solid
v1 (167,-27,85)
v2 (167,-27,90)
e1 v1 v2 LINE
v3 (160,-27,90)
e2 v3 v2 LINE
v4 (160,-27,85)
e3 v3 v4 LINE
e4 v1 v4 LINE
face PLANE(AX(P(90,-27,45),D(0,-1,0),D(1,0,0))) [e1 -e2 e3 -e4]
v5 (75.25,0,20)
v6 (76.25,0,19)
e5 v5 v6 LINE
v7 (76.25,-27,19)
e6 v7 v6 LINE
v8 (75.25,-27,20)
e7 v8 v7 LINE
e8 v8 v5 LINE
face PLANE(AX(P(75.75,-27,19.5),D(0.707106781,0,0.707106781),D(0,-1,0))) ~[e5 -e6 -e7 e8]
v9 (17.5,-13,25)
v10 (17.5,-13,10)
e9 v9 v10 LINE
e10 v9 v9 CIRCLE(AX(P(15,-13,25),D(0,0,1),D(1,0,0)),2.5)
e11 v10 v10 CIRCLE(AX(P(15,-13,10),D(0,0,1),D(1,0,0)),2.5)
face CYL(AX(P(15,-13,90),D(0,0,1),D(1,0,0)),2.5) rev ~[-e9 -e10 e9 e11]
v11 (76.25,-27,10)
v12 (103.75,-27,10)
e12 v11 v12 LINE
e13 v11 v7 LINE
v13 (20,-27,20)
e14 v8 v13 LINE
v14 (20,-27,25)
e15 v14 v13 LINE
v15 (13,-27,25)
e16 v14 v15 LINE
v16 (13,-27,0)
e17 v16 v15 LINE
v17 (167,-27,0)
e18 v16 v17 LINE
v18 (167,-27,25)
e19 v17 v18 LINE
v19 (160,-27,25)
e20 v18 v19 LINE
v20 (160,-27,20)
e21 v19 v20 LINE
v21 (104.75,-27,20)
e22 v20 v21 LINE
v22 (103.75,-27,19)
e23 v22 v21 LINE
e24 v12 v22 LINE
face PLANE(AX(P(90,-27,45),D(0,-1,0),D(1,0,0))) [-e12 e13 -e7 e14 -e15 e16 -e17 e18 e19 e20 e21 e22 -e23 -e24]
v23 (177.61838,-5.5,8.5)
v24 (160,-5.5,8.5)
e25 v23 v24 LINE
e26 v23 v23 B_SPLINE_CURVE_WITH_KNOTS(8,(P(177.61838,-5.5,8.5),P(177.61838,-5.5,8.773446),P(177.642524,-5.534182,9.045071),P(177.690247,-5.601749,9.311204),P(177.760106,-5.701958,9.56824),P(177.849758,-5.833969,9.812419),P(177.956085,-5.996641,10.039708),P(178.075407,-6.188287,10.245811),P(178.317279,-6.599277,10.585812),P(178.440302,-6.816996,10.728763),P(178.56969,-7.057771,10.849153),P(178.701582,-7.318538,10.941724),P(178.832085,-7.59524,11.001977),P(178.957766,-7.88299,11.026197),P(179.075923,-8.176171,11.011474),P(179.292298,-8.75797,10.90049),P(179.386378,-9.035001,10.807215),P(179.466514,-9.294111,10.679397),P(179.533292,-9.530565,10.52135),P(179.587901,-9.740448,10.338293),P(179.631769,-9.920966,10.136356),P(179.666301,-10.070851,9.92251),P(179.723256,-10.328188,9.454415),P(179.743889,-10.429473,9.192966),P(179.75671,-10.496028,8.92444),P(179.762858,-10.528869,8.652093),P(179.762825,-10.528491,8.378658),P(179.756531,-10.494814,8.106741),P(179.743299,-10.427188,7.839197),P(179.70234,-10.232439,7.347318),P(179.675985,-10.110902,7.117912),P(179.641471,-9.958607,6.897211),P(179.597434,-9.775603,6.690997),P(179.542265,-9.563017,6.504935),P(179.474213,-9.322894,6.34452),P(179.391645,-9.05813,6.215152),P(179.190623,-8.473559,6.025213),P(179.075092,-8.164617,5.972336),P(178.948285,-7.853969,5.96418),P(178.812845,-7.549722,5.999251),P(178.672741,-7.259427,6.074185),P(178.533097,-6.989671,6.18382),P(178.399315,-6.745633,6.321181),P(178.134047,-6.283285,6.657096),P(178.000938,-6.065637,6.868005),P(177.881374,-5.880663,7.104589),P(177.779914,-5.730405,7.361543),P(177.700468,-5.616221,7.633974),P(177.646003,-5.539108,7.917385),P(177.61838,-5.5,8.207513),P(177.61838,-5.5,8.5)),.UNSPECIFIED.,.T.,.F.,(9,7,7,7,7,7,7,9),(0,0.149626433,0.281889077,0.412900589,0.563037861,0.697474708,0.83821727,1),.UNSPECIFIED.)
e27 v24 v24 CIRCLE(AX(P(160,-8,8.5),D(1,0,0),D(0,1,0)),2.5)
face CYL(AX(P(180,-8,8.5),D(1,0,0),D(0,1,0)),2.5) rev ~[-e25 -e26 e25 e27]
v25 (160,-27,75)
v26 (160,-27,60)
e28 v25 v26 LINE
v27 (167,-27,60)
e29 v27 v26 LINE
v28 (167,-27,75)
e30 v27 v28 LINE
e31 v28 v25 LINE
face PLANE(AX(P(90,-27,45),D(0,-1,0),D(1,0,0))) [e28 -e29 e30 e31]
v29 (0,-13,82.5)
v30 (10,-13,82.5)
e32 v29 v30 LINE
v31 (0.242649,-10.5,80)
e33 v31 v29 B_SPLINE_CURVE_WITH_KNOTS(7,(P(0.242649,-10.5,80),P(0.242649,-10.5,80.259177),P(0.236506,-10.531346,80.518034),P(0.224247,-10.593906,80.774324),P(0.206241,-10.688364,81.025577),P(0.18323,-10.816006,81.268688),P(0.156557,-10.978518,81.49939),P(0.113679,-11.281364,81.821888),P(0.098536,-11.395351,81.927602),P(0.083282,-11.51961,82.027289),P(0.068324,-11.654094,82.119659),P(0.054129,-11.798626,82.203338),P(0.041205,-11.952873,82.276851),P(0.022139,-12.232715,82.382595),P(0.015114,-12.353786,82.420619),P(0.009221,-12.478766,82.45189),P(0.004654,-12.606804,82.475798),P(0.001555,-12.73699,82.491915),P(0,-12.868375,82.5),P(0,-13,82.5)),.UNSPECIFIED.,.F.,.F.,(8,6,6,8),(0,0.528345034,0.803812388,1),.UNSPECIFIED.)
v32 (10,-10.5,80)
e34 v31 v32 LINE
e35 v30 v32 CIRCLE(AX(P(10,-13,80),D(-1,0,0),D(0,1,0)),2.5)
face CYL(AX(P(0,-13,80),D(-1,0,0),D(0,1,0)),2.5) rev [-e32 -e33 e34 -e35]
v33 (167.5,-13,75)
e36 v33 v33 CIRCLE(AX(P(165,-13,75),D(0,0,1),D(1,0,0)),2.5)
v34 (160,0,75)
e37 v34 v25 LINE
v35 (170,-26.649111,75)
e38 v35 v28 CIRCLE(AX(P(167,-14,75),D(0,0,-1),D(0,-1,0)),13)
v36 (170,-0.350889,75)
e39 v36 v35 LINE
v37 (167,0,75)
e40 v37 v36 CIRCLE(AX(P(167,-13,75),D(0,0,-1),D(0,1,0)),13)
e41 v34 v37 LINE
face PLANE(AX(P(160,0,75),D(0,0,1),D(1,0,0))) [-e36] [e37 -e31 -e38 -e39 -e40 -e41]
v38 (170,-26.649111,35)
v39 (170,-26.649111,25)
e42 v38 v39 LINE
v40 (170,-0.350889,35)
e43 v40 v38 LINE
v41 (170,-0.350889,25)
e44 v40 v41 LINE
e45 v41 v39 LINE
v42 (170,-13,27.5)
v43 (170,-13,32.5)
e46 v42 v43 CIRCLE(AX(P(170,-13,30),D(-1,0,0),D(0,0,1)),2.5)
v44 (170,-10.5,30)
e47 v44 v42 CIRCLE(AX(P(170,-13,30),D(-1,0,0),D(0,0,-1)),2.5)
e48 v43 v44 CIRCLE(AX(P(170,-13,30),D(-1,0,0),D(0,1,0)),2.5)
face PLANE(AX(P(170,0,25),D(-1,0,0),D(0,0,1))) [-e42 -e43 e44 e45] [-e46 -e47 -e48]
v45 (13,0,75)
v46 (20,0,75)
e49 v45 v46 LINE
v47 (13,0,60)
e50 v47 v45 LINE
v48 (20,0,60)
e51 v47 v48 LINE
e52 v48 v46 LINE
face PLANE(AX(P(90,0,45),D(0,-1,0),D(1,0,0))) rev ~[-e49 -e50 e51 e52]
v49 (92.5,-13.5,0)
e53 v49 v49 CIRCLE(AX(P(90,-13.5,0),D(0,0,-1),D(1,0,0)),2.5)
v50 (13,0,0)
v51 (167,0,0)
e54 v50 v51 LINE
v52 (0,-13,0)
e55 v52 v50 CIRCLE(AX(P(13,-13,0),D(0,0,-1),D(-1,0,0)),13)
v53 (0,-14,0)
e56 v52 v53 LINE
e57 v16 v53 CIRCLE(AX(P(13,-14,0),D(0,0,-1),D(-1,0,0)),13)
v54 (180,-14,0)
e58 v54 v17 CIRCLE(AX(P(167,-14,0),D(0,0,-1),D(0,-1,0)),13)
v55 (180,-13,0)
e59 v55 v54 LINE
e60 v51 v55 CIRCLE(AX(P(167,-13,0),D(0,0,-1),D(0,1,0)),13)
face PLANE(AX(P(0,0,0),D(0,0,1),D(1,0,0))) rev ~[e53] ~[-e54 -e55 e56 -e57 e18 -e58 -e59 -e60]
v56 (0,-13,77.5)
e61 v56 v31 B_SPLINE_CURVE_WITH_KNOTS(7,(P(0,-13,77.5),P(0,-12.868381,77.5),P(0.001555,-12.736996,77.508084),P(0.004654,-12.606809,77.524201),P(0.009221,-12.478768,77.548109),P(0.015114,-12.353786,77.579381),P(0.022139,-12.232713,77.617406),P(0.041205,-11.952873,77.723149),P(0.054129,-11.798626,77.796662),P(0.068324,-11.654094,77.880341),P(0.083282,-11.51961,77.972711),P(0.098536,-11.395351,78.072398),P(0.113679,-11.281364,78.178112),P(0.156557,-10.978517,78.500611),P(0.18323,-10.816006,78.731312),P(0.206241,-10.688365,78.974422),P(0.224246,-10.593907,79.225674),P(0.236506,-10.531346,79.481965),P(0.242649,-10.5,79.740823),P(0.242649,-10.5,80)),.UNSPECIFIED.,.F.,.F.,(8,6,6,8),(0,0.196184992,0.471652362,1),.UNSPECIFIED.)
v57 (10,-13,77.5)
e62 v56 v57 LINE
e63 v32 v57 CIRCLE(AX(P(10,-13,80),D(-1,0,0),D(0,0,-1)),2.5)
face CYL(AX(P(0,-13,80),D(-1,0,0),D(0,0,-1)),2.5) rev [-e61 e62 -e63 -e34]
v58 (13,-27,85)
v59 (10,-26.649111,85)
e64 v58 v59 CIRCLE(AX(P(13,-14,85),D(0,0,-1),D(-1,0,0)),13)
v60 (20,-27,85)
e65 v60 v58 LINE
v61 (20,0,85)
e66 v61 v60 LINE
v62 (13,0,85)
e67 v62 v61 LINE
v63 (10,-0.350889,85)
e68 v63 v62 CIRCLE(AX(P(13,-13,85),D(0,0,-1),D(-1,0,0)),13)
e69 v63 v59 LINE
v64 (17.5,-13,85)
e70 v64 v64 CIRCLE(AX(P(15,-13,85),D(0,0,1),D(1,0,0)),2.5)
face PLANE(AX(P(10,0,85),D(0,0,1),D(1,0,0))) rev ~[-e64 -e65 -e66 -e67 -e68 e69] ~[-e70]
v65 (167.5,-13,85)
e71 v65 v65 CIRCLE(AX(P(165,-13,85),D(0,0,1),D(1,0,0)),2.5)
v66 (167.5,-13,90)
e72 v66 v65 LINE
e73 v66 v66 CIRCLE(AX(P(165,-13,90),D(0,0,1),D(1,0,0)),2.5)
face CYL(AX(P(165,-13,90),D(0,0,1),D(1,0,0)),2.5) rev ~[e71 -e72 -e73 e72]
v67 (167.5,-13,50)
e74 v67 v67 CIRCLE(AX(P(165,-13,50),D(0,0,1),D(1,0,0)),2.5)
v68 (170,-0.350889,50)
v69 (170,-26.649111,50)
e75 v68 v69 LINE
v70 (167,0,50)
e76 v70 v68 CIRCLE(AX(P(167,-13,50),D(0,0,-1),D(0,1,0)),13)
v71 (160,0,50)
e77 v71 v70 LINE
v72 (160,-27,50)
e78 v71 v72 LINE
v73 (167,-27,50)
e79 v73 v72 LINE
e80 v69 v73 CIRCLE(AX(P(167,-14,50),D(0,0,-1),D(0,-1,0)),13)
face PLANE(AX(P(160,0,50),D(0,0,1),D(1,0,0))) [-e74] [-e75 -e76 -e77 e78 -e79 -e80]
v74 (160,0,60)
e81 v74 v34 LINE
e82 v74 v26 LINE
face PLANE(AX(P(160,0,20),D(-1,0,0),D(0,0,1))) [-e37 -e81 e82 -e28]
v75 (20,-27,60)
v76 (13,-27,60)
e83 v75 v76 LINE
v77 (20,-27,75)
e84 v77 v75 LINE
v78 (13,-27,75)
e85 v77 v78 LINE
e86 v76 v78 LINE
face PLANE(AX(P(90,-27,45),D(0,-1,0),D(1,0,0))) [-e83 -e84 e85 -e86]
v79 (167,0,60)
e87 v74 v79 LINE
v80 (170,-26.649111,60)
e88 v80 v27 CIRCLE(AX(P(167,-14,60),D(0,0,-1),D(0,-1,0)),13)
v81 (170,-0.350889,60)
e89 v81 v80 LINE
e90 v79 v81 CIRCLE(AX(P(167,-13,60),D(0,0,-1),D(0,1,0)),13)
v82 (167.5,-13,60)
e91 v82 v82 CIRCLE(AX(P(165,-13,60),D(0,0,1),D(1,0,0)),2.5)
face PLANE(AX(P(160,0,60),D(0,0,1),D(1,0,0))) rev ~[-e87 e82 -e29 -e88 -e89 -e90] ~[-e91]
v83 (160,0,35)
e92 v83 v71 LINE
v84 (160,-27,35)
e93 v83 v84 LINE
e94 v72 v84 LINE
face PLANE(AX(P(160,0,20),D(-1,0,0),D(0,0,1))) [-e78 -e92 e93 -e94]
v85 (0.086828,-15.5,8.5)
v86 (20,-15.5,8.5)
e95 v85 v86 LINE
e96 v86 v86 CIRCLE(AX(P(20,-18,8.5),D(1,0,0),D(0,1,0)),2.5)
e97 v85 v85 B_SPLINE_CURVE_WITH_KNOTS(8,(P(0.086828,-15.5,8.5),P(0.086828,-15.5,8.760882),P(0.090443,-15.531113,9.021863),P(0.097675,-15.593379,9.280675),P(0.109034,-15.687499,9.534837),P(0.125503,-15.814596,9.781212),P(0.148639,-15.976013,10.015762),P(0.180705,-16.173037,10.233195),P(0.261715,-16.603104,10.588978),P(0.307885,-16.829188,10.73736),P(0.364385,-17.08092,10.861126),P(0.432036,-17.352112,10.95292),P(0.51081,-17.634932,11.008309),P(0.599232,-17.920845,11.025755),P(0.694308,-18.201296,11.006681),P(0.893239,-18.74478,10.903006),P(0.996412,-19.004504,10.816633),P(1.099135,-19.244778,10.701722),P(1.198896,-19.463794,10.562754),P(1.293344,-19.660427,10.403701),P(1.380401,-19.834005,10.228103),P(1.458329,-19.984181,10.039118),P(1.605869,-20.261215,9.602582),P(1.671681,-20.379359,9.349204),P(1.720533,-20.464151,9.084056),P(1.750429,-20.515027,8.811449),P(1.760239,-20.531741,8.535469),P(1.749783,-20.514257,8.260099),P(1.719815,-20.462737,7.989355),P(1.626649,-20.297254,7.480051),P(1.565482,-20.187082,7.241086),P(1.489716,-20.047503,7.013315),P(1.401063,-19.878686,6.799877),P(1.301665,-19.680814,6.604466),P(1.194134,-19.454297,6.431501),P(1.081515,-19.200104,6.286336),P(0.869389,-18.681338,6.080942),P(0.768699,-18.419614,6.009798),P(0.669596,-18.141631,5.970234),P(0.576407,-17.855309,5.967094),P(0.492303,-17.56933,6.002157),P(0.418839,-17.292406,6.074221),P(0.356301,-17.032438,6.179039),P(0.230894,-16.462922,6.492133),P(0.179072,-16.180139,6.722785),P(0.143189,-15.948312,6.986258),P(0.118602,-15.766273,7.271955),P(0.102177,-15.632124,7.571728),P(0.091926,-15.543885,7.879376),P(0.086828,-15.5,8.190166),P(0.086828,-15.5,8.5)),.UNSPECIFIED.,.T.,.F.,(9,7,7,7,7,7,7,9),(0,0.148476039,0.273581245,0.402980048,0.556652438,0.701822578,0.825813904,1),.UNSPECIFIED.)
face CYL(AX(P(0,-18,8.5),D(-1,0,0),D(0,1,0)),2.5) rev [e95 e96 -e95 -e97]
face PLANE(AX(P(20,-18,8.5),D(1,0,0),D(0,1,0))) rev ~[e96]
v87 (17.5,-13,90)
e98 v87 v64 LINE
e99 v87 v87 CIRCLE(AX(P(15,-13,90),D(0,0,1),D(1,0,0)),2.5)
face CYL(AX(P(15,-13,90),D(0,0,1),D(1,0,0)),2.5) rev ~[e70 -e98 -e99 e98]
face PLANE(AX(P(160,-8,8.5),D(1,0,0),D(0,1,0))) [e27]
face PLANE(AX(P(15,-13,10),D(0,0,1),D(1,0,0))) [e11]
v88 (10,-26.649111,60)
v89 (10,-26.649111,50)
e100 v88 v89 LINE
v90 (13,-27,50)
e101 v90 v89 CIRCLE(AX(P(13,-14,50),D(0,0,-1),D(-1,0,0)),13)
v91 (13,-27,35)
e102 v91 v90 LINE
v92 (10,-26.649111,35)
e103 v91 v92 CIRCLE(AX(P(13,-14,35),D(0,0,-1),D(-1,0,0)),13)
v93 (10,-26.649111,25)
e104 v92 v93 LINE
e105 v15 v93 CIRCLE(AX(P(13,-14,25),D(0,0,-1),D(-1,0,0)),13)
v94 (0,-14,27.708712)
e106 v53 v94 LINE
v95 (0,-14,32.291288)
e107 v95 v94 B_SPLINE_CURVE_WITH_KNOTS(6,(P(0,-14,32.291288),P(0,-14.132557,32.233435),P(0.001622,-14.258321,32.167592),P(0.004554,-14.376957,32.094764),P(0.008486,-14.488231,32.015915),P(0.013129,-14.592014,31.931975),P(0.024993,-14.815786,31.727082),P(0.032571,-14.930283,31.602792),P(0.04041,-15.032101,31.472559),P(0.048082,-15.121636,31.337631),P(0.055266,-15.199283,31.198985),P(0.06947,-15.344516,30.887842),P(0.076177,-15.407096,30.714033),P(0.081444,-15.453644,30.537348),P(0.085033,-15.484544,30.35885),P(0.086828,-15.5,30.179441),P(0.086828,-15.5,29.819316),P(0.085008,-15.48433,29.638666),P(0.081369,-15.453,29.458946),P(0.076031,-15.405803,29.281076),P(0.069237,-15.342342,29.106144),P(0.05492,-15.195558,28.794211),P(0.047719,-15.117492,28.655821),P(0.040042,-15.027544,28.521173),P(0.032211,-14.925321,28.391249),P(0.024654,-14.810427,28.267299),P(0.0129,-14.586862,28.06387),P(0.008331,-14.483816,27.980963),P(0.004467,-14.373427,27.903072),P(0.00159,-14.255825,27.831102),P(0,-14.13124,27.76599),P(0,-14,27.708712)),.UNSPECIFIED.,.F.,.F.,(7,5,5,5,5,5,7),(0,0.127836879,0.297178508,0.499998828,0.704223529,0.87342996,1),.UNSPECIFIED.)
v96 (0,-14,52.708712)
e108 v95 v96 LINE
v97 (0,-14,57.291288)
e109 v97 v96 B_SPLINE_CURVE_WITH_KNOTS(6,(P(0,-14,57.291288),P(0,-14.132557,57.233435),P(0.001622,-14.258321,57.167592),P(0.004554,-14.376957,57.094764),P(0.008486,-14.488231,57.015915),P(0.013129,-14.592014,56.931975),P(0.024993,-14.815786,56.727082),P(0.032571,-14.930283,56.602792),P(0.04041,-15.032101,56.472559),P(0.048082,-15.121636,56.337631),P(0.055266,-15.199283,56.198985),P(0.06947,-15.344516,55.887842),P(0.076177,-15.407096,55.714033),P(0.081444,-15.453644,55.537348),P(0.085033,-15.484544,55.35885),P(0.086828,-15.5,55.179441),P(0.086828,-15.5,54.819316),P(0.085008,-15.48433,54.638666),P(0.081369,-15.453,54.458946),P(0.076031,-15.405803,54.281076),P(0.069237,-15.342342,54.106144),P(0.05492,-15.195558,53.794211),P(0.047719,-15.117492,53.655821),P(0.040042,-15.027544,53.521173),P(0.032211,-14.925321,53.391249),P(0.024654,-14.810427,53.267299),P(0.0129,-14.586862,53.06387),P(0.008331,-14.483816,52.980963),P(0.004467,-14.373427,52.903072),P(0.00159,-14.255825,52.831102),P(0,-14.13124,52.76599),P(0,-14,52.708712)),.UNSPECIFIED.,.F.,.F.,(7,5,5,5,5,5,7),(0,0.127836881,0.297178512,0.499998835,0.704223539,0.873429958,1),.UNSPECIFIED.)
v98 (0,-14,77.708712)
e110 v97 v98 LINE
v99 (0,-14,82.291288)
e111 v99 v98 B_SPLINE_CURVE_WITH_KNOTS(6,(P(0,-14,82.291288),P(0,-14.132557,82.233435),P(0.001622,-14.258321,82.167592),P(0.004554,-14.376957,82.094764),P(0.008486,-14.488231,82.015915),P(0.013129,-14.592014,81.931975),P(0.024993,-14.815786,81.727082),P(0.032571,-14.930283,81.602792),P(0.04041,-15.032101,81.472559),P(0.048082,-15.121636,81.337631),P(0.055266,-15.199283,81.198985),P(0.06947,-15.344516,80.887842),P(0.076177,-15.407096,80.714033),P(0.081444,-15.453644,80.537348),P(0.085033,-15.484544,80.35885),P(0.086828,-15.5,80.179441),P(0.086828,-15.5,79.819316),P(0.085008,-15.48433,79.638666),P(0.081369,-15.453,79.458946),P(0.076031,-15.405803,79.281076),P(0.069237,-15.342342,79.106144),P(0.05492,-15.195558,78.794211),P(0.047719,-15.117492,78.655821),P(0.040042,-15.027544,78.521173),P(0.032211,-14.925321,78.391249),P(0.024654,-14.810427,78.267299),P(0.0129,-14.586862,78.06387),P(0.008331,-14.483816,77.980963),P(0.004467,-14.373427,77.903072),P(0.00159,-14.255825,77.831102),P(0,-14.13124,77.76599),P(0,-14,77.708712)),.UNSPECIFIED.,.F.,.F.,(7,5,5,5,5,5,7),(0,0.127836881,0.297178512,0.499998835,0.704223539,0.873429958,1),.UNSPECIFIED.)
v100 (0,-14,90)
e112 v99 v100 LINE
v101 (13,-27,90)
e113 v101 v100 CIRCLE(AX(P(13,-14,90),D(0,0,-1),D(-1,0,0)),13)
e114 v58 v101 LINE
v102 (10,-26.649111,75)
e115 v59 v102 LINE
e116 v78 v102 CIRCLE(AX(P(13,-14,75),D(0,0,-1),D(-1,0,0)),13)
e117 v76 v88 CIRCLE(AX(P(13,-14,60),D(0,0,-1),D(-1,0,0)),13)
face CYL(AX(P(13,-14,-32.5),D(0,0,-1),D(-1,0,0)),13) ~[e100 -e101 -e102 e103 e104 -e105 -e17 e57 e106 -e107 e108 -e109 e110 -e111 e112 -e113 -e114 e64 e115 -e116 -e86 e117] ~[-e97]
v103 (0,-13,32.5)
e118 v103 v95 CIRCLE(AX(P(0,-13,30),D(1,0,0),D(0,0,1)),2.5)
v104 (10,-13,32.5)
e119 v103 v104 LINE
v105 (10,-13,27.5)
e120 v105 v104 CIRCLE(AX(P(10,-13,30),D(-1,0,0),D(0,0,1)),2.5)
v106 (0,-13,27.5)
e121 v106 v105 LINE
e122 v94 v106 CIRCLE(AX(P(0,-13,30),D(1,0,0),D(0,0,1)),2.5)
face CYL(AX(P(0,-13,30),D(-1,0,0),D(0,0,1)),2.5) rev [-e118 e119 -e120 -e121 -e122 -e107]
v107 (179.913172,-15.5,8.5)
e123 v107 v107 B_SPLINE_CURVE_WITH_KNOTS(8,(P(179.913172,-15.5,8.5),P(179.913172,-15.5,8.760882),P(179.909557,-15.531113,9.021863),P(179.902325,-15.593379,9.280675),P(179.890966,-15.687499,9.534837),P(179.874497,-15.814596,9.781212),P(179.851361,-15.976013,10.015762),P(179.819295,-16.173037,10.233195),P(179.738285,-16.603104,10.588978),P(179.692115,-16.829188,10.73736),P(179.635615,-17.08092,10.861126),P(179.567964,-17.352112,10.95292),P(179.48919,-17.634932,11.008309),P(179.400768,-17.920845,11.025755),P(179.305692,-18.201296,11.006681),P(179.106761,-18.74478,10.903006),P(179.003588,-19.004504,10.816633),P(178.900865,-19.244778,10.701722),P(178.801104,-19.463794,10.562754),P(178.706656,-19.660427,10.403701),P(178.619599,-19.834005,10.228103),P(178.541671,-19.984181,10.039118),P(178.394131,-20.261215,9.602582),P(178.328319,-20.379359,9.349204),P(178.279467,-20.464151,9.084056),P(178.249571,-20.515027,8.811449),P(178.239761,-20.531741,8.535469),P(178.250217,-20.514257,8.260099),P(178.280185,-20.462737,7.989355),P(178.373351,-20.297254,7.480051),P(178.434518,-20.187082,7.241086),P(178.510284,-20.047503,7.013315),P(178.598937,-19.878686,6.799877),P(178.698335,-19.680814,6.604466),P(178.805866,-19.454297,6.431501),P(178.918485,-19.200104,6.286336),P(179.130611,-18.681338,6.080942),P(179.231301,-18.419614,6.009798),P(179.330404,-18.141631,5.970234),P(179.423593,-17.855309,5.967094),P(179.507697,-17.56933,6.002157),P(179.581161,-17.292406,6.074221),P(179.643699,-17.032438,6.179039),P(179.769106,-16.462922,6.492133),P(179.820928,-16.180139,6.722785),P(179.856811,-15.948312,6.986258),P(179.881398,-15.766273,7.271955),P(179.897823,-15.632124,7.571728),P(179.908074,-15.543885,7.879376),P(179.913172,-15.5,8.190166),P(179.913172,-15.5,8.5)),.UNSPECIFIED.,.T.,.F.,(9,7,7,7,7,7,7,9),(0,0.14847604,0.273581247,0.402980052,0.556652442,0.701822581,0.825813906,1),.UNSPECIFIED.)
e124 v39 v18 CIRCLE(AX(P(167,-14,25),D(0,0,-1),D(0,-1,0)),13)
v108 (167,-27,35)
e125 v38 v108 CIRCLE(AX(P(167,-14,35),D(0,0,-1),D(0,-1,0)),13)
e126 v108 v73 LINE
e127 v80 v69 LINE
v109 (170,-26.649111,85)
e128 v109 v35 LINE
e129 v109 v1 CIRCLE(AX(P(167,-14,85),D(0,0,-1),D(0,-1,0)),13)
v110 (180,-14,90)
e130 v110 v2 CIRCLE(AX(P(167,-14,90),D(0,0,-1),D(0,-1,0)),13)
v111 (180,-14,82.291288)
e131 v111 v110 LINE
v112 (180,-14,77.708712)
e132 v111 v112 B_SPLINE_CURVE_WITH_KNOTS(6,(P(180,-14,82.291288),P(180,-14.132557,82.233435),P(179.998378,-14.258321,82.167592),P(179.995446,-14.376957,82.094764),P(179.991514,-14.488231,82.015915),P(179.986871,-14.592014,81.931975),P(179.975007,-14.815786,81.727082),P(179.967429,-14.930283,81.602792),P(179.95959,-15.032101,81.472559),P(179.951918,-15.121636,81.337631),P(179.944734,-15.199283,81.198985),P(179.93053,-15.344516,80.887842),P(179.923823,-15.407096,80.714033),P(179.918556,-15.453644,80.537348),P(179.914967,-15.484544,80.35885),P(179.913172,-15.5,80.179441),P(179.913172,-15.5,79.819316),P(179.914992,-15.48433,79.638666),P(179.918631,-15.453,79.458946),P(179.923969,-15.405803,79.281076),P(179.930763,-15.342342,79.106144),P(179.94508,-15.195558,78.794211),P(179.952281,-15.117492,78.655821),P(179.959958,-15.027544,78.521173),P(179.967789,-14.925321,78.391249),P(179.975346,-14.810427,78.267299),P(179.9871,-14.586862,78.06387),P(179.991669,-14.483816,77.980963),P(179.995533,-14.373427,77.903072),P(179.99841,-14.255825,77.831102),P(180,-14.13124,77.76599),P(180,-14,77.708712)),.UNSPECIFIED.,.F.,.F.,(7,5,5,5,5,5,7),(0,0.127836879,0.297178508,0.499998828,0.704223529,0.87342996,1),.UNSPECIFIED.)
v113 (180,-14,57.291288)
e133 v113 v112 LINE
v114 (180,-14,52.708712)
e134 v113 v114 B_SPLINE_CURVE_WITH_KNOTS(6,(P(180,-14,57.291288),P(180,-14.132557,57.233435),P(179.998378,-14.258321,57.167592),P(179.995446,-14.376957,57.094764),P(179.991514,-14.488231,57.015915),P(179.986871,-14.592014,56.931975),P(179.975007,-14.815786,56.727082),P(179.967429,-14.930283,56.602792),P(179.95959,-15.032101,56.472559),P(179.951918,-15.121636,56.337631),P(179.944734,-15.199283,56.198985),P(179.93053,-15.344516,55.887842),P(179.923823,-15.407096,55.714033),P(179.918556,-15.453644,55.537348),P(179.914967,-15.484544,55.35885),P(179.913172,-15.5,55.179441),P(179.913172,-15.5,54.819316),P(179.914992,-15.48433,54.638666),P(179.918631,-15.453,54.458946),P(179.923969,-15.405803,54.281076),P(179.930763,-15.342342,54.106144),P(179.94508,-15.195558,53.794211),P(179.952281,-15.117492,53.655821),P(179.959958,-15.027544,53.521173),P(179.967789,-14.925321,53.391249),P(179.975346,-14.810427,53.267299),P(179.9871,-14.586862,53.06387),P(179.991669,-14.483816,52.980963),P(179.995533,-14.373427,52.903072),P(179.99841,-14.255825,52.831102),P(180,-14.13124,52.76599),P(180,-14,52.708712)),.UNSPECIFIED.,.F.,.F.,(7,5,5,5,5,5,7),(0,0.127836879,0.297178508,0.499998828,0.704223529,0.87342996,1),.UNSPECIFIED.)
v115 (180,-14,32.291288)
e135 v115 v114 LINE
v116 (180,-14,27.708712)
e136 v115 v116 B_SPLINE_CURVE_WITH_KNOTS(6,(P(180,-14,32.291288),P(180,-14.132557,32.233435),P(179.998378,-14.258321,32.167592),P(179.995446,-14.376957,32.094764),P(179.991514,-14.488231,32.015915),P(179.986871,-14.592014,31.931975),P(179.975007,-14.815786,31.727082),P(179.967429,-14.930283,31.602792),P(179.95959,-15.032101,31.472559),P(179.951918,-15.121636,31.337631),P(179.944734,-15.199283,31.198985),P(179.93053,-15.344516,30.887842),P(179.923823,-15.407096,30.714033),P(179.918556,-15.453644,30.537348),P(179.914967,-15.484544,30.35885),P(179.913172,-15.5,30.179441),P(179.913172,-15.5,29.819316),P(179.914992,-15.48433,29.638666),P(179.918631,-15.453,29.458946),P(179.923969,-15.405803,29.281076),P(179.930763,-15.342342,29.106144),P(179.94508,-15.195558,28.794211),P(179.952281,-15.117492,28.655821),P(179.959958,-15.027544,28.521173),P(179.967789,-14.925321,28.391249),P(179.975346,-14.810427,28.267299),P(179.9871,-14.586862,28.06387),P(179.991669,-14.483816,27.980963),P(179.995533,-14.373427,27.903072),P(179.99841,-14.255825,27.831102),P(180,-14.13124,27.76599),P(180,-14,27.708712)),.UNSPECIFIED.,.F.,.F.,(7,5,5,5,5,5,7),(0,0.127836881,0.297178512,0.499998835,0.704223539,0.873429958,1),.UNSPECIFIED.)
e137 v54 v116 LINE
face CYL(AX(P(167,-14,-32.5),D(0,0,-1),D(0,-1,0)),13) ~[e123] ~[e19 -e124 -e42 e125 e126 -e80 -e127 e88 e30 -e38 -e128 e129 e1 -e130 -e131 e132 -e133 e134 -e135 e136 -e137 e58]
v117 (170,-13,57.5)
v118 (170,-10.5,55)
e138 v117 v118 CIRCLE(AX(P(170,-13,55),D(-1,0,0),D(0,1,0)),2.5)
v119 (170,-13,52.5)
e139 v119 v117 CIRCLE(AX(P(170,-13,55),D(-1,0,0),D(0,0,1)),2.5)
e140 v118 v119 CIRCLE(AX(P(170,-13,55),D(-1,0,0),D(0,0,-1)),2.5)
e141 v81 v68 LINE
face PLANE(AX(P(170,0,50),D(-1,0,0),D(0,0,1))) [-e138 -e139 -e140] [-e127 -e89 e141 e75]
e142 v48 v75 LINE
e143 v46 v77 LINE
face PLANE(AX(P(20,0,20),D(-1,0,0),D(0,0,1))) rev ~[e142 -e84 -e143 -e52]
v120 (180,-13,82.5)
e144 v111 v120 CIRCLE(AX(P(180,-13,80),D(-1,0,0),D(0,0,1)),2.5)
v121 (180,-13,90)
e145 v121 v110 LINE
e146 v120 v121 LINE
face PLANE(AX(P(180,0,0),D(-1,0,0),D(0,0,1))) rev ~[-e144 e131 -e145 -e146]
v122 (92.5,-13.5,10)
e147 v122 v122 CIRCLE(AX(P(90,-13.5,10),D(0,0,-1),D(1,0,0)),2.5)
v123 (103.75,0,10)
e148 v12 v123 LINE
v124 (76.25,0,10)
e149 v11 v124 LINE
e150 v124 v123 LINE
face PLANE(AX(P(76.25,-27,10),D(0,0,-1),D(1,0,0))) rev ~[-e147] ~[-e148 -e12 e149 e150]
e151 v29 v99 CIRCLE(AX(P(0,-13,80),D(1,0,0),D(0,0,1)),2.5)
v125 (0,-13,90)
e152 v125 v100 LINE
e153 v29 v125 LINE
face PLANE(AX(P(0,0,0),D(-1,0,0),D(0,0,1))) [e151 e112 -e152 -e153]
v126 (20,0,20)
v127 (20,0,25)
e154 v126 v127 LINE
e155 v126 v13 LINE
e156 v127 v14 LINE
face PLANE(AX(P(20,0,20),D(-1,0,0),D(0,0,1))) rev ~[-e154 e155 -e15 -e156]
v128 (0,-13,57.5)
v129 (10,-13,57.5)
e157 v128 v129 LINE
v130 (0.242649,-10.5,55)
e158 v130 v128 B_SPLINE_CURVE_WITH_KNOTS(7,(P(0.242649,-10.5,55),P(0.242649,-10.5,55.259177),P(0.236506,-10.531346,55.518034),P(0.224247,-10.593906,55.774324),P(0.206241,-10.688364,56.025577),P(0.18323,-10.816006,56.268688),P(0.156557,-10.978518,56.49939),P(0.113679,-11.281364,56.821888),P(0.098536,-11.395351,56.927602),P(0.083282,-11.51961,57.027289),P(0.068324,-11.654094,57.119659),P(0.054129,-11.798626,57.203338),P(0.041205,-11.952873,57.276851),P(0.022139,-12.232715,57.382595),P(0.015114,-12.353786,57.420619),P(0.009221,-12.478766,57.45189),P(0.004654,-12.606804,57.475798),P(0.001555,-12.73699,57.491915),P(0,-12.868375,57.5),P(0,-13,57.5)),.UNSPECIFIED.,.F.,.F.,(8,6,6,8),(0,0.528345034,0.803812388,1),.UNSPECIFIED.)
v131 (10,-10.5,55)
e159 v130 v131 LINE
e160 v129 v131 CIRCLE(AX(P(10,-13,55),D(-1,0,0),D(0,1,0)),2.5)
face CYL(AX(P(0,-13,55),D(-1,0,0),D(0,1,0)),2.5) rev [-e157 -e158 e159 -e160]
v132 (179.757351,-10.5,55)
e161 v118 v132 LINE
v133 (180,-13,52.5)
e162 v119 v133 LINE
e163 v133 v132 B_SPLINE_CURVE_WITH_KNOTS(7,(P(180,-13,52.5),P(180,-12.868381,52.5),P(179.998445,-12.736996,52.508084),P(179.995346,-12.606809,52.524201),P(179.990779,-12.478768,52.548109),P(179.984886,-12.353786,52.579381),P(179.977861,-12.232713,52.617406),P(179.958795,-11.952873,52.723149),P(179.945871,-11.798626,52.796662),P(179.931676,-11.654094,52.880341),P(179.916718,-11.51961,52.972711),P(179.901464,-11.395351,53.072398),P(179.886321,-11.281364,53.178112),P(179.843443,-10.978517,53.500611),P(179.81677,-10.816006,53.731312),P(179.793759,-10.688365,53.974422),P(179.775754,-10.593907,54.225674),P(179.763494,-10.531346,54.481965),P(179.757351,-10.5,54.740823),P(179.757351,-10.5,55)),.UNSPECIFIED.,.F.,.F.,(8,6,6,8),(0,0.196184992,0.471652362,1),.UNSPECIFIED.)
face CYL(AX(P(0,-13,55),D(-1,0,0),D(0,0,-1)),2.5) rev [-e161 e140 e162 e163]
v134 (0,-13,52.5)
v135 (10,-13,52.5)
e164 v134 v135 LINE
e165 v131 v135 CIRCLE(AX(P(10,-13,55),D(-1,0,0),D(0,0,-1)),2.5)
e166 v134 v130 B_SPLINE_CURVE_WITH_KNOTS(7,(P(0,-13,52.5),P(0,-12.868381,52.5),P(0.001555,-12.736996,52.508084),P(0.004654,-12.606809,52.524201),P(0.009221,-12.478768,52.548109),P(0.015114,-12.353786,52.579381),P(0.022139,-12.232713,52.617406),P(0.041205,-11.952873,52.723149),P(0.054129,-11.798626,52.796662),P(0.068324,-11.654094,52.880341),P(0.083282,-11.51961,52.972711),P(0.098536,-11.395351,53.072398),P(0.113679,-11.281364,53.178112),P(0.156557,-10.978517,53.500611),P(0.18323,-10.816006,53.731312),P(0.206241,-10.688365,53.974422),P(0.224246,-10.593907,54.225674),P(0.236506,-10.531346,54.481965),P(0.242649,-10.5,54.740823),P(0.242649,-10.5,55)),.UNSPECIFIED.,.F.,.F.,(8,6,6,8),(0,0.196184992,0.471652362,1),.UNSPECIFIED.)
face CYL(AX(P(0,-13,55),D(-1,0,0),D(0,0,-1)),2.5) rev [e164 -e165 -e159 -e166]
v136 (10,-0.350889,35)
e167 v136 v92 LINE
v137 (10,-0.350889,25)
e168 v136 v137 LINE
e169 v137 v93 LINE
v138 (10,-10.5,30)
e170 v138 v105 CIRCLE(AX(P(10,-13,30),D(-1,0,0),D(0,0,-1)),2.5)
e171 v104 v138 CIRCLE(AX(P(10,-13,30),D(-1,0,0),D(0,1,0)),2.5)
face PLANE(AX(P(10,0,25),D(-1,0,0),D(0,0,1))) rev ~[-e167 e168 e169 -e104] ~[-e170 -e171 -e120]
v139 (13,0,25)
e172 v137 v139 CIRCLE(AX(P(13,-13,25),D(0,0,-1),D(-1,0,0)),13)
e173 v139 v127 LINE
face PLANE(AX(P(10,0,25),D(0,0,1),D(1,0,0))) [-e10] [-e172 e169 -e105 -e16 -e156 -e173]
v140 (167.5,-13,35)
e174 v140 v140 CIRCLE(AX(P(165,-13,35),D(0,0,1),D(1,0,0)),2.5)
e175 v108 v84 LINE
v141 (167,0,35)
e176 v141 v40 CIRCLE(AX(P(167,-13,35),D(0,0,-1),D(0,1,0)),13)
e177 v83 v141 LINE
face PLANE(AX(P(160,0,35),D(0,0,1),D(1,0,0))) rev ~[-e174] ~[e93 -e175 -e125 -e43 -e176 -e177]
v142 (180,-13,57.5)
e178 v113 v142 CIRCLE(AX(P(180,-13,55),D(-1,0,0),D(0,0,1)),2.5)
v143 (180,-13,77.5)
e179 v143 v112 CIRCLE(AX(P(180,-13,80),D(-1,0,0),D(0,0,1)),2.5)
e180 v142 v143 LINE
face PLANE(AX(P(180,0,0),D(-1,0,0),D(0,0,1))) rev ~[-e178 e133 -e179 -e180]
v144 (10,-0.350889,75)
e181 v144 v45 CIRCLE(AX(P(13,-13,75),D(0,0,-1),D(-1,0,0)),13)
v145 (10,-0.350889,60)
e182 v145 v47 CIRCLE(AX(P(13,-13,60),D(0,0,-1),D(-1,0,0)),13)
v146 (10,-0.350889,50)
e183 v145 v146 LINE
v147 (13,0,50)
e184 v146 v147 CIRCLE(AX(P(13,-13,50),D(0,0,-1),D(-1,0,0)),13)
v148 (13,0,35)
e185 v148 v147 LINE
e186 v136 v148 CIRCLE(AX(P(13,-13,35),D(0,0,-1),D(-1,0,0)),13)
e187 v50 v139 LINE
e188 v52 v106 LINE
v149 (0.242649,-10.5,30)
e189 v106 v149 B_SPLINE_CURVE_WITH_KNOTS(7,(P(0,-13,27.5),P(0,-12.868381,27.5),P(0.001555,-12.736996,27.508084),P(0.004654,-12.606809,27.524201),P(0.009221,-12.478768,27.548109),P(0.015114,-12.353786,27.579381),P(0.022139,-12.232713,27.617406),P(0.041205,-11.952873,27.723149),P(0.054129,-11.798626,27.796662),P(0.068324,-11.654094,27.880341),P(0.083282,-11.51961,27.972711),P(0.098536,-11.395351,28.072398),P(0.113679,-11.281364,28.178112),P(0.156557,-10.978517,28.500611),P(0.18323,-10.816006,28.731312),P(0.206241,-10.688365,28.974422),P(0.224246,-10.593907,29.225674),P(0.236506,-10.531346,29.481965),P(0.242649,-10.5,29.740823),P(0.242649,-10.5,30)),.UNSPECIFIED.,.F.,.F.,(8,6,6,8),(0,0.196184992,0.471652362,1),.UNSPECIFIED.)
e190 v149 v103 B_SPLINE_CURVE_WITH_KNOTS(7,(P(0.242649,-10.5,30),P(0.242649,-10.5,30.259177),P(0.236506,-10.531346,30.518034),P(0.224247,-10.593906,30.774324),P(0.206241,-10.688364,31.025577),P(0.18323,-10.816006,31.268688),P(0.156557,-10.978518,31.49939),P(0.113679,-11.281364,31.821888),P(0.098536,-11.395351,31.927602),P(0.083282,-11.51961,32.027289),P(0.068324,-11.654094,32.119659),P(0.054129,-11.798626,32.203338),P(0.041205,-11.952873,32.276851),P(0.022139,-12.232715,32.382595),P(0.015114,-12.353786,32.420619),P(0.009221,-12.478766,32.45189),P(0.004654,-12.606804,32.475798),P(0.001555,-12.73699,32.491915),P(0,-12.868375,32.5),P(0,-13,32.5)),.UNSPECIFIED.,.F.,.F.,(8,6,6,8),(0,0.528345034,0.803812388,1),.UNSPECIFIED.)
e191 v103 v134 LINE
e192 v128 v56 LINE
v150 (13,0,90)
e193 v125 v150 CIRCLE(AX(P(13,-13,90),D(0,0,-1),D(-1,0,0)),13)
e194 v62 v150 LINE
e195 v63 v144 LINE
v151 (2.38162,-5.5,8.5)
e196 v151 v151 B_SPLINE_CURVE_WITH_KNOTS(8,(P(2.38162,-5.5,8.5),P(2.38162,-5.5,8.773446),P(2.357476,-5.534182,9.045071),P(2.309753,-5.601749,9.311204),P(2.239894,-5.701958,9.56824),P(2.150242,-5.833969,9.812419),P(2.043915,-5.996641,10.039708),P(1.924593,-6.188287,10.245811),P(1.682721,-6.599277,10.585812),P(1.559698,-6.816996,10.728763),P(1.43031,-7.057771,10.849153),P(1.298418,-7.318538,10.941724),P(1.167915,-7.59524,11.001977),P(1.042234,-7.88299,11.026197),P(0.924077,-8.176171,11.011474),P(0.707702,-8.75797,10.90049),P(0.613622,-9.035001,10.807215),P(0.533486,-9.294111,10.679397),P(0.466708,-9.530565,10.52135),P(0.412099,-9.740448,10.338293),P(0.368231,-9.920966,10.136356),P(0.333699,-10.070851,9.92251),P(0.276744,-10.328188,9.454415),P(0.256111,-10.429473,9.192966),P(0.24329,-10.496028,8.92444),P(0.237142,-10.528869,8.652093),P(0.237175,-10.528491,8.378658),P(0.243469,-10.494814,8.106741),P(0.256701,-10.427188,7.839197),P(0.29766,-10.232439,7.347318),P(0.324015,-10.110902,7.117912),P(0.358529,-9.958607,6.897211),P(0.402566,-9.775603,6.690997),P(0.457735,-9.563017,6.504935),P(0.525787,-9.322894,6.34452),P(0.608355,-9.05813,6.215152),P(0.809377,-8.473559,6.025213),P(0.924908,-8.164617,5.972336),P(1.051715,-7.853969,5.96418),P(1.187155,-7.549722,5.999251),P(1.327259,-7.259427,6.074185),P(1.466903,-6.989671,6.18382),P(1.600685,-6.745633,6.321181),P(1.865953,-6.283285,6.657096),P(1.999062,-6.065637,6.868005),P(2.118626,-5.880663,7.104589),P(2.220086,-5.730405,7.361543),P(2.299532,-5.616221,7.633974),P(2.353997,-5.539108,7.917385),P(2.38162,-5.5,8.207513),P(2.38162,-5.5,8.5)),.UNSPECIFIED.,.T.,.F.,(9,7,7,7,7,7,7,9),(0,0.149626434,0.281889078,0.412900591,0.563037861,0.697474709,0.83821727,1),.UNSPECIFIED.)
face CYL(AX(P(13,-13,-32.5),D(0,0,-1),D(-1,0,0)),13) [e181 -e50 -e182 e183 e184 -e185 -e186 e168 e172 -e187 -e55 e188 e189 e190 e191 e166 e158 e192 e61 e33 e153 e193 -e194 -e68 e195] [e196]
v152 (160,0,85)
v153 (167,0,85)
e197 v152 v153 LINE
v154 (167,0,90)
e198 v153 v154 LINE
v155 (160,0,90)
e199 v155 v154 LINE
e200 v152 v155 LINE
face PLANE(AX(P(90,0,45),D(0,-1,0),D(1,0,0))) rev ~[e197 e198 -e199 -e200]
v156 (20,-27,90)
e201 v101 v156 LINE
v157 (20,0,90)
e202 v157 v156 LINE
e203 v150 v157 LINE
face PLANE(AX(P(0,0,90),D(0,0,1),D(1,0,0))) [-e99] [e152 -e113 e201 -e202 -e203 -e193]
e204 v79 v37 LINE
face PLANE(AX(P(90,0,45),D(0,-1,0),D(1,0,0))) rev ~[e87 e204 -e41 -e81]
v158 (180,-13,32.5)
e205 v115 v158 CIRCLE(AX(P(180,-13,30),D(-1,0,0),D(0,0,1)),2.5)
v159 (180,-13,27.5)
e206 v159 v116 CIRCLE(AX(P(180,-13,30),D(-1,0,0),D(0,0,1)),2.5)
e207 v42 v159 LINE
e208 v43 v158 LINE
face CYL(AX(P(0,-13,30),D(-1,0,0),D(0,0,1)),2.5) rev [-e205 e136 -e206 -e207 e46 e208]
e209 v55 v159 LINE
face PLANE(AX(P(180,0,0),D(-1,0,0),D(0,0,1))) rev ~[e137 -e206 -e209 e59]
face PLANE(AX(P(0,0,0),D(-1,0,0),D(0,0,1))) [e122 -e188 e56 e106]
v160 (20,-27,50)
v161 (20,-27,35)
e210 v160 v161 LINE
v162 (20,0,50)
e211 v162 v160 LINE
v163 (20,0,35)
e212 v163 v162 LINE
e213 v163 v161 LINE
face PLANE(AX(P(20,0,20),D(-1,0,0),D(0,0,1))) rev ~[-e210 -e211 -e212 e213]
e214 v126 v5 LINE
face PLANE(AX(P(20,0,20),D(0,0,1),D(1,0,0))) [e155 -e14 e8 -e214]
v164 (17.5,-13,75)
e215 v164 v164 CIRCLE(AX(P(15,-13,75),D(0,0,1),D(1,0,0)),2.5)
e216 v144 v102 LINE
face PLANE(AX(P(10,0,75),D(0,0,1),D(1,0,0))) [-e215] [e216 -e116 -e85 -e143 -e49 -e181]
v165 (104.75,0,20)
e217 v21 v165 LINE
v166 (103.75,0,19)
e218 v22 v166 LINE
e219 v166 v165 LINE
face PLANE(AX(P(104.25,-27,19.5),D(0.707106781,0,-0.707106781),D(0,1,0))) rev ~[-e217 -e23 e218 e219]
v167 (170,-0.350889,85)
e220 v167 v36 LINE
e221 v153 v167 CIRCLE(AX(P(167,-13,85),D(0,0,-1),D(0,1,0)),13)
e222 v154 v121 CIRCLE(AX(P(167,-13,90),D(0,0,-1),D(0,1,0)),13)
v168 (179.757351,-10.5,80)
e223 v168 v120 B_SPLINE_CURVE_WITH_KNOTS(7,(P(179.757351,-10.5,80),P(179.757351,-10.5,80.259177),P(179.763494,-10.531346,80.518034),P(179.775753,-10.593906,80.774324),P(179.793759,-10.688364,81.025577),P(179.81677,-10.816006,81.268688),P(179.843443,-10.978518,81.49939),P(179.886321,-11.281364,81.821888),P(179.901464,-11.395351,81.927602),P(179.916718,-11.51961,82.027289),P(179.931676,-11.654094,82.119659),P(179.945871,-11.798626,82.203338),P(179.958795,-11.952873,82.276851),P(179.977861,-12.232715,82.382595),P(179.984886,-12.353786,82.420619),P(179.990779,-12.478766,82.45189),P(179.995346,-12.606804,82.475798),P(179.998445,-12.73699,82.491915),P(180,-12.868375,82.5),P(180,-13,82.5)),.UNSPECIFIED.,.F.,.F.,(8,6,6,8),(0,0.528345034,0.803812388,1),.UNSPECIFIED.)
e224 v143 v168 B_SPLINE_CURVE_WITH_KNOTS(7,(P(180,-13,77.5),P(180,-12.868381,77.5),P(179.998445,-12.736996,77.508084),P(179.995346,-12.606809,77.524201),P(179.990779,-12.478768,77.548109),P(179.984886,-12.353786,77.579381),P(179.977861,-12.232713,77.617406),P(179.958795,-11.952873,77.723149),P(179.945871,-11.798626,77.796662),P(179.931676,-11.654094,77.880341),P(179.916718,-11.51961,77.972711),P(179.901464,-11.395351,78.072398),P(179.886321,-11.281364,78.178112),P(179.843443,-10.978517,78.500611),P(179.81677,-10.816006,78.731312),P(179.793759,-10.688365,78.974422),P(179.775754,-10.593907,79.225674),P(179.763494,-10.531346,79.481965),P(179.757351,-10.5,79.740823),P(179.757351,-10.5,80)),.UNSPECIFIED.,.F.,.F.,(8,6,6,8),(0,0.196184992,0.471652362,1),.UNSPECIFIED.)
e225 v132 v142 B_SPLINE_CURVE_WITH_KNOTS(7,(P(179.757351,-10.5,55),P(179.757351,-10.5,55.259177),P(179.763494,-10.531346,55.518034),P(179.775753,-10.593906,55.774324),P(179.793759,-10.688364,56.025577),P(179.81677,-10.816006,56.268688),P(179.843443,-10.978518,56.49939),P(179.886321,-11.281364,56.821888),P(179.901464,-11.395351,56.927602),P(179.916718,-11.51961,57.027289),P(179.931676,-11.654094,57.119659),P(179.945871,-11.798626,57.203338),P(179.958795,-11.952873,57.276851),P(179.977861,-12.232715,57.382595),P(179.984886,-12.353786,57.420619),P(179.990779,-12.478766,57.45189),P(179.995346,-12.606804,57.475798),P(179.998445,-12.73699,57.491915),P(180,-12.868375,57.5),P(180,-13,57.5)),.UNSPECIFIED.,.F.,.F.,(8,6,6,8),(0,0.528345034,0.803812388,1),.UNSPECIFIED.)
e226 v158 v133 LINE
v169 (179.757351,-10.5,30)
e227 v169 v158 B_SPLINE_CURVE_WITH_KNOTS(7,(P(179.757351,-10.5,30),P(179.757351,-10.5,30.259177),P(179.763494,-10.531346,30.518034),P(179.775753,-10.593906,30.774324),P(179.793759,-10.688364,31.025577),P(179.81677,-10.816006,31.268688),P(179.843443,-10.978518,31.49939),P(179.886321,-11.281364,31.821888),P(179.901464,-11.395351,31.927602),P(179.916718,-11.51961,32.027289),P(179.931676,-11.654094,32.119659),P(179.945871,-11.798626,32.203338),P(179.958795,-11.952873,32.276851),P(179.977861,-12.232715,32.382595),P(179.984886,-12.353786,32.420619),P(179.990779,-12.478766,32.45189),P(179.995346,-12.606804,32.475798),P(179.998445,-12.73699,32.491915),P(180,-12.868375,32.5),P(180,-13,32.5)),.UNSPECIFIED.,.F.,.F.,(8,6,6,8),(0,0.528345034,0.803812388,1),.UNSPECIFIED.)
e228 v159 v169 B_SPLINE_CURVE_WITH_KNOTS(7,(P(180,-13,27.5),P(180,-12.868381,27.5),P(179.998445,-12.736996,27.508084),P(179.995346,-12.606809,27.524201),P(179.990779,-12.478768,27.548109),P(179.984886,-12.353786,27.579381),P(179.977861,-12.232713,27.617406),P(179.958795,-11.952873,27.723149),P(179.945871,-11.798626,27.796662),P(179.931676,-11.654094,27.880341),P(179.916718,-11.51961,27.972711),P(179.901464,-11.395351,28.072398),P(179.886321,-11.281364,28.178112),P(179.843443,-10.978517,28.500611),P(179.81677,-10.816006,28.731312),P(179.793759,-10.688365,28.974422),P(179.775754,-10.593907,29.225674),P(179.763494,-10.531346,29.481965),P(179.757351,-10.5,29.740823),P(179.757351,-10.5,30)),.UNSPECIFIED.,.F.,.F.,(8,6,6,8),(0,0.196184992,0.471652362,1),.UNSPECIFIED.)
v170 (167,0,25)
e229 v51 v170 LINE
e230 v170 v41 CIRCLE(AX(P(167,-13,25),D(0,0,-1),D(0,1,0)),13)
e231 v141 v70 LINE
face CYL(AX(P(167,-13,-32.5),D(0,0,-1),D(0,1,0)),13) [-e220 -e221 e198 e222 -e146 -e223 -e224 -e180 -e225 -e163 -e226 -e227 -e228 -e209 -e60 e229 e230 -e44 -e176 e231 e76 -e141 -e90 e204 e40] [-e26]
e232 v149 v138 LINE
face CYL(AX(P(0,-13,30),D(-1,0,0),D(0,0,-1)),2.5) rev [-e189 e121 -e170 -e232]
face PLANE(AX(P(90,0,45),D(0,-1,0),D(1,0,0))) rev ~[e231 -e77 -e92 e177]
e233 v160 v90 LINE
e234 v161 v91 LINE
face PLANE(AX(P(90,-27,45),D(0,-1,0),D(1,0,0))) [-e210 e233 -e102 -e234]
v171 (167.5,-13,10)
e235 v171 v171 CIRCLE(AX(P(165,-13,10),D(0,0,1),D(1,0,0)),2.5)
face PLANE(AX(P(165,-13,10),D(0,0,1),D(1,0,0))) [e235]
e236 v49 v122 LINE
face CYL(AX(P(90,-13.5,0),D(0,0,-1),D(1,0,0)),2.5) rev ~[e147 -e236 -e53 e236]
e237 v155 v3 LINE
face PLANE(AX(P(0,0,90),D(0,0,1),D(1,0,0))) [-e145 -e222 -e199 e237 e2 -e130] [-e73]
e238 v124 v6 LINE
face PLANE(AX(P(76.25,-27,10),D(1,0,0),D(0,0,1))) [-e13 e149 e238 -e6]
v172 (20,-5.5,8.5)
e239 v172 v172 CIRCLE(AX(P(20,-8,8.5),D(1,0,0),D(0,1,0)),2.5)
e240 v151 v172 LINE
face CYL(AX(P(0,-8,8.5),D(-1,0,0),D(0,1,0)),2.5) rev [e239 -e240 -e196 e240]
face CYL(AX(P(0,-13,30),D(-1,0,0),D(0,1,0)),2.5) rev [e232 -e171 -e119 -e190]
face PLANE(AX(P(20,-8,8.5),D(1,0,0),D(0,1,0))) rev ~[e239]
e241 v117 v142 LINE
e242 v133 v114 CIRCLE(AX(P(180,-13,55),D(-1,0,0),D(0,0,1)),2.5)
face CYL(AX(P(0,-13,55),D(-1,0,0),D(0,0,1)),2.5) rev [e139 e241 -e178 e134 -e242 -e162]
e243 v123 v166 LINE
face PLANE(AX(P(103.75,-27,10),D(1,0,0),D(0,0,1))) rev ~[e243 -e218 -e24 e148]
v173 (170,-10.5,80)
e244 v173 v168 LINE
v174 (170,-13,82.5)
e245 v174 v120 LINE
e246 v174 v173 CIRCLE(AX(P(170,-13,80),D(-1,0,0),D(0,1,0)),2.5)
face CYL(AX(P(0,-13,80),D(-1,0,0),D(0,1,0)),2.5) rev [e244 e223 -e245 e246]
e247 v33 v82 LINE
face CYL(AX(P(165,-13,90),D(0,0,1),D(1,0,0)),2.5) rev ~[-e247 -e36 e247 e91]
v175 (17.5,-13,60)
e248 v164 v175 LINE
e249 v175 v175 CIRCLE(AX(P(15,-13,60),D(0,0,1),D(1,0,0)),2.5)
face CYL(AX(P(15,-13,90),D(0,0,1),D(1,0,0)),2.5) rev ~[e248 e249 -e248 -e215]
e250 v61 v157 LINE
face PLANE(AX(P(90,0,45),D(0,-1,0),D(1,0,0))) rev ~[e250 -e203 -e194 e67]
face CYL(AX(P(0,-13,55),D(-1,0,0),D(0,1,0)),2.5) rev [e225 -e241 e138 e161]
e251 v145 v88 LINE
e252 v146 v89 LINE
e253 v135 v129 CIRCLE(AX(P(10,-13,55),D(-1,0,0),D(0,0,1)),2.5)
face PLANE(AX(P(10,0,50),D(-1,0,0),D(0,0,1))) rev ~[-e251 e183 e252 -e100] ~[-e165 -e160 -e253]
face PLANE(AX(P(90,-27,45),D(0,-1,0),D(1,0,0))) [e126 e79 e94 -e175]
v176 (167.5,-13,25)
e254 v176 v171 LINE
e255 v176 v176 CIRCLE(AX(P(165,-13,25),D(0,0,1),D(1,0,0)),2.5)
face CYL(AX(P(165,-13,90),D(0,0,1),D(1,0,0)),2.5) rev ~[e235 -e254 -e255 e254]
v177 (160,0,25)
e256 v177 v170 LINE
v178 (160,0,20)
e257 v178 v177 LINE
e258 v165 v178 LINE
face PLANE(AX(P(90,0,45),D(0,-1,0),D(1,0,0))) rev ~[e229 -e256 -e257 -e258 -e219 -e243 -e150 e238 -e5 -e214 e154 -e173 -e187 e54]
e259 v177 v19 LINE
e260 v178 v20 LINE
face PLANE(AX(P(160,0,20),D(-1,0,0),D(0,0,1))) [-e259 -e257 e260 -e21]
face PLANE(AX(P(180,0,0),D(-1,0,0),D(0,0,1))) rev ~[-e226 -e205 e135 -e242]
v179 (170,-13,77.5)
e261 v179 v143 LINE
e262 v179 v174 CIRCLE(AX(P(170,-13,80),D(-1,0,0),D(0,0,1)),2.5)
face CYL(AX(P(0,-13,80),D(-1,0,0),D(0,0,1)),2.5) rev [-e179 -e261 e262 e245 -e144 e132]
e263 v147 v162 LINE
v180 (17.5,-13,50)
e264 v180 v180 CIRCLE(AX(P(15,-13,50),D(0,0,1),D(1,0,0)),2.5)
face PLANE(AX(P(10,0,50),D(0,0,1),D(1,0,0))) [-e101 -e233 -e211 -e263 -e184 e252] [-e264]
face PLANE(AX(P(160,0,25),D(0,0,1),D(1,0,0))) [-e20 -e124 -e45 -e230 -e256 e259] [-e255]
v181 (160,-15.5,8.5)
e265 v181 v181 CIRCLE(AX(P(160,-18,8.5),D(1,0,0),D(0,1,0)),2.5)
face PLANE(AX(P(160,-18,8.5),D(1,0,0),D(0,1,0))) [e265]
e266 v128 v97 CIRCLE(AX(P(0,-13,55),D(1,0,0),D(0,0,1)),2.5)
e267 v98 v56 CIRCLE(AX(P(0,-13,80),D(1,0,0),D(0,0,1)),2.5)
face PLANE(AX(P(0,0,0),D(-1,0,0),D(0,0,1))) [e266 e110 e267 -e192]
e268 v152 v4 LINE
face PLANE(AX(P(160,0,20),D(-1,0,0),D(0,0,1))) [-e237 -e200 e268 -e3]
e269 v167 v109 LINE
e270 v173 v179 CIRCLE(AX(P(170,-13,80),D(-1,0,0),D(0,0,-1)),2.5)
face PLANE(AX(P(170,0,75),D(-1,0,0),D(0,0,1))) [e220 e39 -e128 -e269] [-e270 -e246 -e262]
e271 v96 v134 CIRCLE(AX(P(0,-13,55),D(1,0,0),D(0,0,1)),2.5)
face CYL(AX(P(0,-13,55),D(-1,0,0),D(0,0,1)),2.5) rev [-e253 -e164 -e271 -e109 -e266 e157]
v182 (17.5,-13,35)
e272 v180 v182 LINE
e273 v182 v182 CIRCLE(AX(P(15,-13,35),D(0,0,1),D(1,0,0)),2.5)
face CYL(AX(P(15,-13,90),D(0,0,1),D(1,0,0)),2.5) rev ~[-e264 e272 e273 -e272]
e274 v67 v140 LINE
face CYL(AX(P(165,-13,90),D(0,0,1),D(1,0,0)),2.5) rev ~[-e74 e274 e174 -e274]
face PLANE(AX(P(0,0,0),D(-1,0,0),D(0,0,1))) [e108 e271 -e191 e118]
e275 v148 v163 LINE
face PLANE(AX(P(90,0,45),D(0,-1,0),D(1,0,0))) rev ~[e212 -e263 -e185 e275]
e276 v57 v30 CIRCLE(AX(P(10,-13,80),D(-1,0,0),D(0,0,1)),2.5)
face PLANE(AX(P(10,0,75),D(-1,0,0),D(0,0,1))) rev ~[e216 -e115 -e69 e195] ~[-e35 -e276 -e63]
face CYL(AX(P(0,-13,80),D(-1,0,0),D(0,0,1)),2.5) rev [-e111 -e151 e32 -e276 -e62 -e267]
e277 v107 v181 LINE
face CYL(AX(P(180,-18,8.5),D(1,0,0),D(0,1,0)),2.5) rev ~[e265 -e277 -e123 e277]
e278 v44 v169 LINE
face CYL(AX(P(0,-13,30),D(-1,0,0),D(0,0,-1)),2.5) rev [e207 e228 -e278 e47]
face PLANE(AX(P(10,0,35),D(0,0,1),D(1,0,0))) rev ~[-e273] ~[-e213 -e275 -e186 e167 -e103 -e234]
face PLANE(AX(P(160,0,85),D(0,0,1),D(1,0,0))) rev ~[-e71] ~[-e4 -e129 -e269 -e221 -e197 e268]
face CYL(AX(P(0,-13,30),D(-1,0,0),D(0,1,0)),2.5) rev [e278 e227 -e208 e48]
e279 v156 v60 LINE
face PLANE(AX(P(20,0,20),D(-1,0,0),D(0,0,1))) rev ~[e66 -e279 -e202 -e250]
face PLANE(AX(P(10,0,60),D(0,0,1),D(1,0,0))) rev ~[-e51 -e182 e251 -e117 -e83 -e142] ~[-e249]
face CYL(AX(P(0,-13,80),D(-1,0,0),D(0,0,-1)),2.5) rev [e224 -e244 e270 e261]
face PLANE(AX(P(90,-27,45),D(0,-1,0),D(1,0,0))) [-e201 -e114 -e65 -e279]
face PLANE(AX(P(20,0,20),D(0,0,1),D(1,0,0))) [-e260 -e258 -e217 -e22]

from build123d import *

# Parameters (mm, degrees)
F0_W         = 180
F0_H         = 90
F1_DEPTH     = 27
F2_W         = 140
F2_H         = 70
F3_DEPTH     = 27.001
F4_W         = 10
F4_H         = 10
F5_DEPTH     = 27.001
F6_R         = 2.5
F7_DEPTH     = 80
F9_DEPTH     = 180.001
F11_R        = 2.5
F12_DEPTH    = 20
F10_R        = 2.5
F13_DEPTH    = 20
F14_T1_DEPTH = 155
F15_W        = 27.5
F15_H        = 10
F16_DEPTH    = 27.0010001
F18_SIZE     = 1
F19_R        = 2.5
F20_DEPTH    = 90.0010001


# Not quite as in the source:
# - a fillet or chamfer that OpenCascade refuses, or shapes differently, is made with other operations: its cross-section is extruded or revolved along the edge and cut away or added


with BuildPart() as f1:
    # F0 (on Front) → F1 (new body)
    with BuildSketch(Plane.XZ):
        with Locations((90, 45)):
            Rectangle(F0_W, F0_H)
    extrude(amount=F1_DEPTH)

    # F2 (on Front) → F3 (cut, through all)
    with BuildSketch(Plane.XZ):
        with Locations((90, 55)):
            Rectangle(F2_W, F2_H)
    extrude(amount=F3_DEPTH, mode=Mode.SUBTRACT)

    # F4 (on Front) → F5 (cut, through all)
    with BuildSketch(Plane.XZ):
        with Locations((165, 80)):
            Rectangle(F4_W, F4_H)
        with Locations((165, 55)):
            Rectangle(F4_W, F4_H)
        with Locations((165, 30)):
            Rectangle(F4_W, F4_H)
        with Locations((15, 30)):
            Rectangle(F4_W, F4_H)
        with Locations((15, 55)):
            Rectangle(F4_W, F4_H)
        with Locations((15, 80)):
            Rectangle(F4_W, F4_H)
    extrude(amount=F5_DEPTH, mode=Mode.SUBTRACT)

    # F6 (on face) → F7 (cut)
    with BuildSketch(Plane.XY.offset(90)):
        with Locations((165, -13)):
            Circle(F6_R)
        with Locations((15, -13)):
            Circle(F6_R)
    extrude(amount=-F7_DEPTH, mode=Mode.SUBTRACT)

    # F8 (on Right) → F9 (cut, through all)
    with BuildSketch(Plane.YZ):
        with BuildLine():
            Line((-13, 77.5), (-13, 82.5))
            ThreePointArc((-13, 82.5), (-15.5, 80), (-13, 77.5))
        make_face()
        with BuildLine():
            ThreePointArc((-13, 77.5), (-11.232233047, 78.232233047), (-10.5, 80))
            ThreePointArc((-10.5, 80), (-11.232233047, 81.767766953), (-13, 82.5))
            Line((-13, 82.5), (-13, 77.5))
        make_face()
        with BuildLine():
            Line((-13, 52.5), (-13, 57.5))
            ThreePointArc((-13, 57.5), (-15.5, 55), (-13, 52.5))
        make_face()
        with BuildLine():
            ThreePointArc((-10.5, 55), (-11.232233047, 56.767766953), (-13, 57.5))
            Line((-13, 57.5), (-13, 52.5))
            ThreePointArc((-13, 52.5), (-11.232233047, 53.232233047), (-10.5, 55))
        make_face()
        with BuildLine():
            Line((-13, 27.5), (-13, 32.5))
            ThreePointArc((-13, 32.5), (-15.5, 30), (-13, 27.5))
        make_face()
        with BuildLine():
            ThreePointArc((-10.5, 30), (-11.232233047, 31.767766953), (-13, 32.5))
            Line((-13, 32.5), (-13, 27.5))
            ThreePointArc((-13, 27.5), (-11.232233047, 28.232233047), (-10.5, 30))
        make_face()
    extrude(amount=F9_DEPTH, mode=Mode.SUBTRACT)

    # F11 (on face) → F12 (cut)
    with BuildSketch(Plane.YZ.offset(180)):
        with Locations((-8, 8.5)):
            Circle(F11_R)
        with Locations((-18, 8.5)):
            Circle(F11_R)
    extrude(amount=-F12_DEPTH, mode=Mode.SUBTRACT)

    # F10 (on Right) → F13 (cut)
    with BuildSketch(Plane.YZ):
        with Locations((-8, 8.5)):
            Circle(F10_R)
        with Locations((-18, 8.5)):
            Circle(F10_R)
    extrude(amount=F13_DEPTH, mode=Mode.SUBTRACT)

    # F14: fillet of radius 13 on 4 edges, made by hand

    # F14_s2 → F14_t1 (cut)
    with BuildSketch(Plane.XY.offset(-32.5)):
        with BuildLine():
            ThreePointArc((0, -13), (3.8076118446, -3.8076118446), (13, 0))
            Line((13, 0), (0, 0))
            Line((0, 0), (0, -13))
        make_face()
        with BuildLine():
            ThreePointArc((0, -14), (3.8076118446, -23.1923881554), (13, -27))
            Line((13, -27), (0, -27))
            Line((0, -27), (0, -14))
        make_face()
        with BuildLine():
            ThreePointArc((167, -27), (176.1923881554, -23.1923881554), (180, -14))
            Line((180, -14), (180, -27))
            Line((180, -27), (167, -27))
        make_face()
        with BuildLine():
            ThreePointArc((167, 0), (176.1923881554, -3.8076118446), (180, -13))
            Line((180, -13), (180, 0))
            Line((180, 0), (167, 0))
        make_face()
    extrude(amount=F14_T1_DEPTH, mode=Mode.SUBTRACT)

    # F15 (on face) → F16 (cut, through all)
    with BuildSketch(Plane.XZ.offset(27)):
        with Locations((90, 15)):
            Rectangle(F15_W, F15_H)
    extrude(amount=-F16_DEPTH, mode=Mode.SUBTRACT)

    # F18
    f18_edges = [f1.edges().sort_by_distance(p)[0] for p in [
        (103.75, -13.5, 20),
        (76.25, -13.5, 20),
    ]]
    chamfer(f18_edges, length=F18_SIZE)

    # F19 (on face) → F20 (cut, through all)
    with BuildSketch(Plane(origin=(0, 0, 0), x_dir=(1, 0, 0), z_dir=(0, 0, -1))):
        with Locations((90, 13.5)):
            Circle(F19_R)
    extrude(amount=-F20_DEPTH, mode=Mode.SUBTRACT)


solid = f1.part
